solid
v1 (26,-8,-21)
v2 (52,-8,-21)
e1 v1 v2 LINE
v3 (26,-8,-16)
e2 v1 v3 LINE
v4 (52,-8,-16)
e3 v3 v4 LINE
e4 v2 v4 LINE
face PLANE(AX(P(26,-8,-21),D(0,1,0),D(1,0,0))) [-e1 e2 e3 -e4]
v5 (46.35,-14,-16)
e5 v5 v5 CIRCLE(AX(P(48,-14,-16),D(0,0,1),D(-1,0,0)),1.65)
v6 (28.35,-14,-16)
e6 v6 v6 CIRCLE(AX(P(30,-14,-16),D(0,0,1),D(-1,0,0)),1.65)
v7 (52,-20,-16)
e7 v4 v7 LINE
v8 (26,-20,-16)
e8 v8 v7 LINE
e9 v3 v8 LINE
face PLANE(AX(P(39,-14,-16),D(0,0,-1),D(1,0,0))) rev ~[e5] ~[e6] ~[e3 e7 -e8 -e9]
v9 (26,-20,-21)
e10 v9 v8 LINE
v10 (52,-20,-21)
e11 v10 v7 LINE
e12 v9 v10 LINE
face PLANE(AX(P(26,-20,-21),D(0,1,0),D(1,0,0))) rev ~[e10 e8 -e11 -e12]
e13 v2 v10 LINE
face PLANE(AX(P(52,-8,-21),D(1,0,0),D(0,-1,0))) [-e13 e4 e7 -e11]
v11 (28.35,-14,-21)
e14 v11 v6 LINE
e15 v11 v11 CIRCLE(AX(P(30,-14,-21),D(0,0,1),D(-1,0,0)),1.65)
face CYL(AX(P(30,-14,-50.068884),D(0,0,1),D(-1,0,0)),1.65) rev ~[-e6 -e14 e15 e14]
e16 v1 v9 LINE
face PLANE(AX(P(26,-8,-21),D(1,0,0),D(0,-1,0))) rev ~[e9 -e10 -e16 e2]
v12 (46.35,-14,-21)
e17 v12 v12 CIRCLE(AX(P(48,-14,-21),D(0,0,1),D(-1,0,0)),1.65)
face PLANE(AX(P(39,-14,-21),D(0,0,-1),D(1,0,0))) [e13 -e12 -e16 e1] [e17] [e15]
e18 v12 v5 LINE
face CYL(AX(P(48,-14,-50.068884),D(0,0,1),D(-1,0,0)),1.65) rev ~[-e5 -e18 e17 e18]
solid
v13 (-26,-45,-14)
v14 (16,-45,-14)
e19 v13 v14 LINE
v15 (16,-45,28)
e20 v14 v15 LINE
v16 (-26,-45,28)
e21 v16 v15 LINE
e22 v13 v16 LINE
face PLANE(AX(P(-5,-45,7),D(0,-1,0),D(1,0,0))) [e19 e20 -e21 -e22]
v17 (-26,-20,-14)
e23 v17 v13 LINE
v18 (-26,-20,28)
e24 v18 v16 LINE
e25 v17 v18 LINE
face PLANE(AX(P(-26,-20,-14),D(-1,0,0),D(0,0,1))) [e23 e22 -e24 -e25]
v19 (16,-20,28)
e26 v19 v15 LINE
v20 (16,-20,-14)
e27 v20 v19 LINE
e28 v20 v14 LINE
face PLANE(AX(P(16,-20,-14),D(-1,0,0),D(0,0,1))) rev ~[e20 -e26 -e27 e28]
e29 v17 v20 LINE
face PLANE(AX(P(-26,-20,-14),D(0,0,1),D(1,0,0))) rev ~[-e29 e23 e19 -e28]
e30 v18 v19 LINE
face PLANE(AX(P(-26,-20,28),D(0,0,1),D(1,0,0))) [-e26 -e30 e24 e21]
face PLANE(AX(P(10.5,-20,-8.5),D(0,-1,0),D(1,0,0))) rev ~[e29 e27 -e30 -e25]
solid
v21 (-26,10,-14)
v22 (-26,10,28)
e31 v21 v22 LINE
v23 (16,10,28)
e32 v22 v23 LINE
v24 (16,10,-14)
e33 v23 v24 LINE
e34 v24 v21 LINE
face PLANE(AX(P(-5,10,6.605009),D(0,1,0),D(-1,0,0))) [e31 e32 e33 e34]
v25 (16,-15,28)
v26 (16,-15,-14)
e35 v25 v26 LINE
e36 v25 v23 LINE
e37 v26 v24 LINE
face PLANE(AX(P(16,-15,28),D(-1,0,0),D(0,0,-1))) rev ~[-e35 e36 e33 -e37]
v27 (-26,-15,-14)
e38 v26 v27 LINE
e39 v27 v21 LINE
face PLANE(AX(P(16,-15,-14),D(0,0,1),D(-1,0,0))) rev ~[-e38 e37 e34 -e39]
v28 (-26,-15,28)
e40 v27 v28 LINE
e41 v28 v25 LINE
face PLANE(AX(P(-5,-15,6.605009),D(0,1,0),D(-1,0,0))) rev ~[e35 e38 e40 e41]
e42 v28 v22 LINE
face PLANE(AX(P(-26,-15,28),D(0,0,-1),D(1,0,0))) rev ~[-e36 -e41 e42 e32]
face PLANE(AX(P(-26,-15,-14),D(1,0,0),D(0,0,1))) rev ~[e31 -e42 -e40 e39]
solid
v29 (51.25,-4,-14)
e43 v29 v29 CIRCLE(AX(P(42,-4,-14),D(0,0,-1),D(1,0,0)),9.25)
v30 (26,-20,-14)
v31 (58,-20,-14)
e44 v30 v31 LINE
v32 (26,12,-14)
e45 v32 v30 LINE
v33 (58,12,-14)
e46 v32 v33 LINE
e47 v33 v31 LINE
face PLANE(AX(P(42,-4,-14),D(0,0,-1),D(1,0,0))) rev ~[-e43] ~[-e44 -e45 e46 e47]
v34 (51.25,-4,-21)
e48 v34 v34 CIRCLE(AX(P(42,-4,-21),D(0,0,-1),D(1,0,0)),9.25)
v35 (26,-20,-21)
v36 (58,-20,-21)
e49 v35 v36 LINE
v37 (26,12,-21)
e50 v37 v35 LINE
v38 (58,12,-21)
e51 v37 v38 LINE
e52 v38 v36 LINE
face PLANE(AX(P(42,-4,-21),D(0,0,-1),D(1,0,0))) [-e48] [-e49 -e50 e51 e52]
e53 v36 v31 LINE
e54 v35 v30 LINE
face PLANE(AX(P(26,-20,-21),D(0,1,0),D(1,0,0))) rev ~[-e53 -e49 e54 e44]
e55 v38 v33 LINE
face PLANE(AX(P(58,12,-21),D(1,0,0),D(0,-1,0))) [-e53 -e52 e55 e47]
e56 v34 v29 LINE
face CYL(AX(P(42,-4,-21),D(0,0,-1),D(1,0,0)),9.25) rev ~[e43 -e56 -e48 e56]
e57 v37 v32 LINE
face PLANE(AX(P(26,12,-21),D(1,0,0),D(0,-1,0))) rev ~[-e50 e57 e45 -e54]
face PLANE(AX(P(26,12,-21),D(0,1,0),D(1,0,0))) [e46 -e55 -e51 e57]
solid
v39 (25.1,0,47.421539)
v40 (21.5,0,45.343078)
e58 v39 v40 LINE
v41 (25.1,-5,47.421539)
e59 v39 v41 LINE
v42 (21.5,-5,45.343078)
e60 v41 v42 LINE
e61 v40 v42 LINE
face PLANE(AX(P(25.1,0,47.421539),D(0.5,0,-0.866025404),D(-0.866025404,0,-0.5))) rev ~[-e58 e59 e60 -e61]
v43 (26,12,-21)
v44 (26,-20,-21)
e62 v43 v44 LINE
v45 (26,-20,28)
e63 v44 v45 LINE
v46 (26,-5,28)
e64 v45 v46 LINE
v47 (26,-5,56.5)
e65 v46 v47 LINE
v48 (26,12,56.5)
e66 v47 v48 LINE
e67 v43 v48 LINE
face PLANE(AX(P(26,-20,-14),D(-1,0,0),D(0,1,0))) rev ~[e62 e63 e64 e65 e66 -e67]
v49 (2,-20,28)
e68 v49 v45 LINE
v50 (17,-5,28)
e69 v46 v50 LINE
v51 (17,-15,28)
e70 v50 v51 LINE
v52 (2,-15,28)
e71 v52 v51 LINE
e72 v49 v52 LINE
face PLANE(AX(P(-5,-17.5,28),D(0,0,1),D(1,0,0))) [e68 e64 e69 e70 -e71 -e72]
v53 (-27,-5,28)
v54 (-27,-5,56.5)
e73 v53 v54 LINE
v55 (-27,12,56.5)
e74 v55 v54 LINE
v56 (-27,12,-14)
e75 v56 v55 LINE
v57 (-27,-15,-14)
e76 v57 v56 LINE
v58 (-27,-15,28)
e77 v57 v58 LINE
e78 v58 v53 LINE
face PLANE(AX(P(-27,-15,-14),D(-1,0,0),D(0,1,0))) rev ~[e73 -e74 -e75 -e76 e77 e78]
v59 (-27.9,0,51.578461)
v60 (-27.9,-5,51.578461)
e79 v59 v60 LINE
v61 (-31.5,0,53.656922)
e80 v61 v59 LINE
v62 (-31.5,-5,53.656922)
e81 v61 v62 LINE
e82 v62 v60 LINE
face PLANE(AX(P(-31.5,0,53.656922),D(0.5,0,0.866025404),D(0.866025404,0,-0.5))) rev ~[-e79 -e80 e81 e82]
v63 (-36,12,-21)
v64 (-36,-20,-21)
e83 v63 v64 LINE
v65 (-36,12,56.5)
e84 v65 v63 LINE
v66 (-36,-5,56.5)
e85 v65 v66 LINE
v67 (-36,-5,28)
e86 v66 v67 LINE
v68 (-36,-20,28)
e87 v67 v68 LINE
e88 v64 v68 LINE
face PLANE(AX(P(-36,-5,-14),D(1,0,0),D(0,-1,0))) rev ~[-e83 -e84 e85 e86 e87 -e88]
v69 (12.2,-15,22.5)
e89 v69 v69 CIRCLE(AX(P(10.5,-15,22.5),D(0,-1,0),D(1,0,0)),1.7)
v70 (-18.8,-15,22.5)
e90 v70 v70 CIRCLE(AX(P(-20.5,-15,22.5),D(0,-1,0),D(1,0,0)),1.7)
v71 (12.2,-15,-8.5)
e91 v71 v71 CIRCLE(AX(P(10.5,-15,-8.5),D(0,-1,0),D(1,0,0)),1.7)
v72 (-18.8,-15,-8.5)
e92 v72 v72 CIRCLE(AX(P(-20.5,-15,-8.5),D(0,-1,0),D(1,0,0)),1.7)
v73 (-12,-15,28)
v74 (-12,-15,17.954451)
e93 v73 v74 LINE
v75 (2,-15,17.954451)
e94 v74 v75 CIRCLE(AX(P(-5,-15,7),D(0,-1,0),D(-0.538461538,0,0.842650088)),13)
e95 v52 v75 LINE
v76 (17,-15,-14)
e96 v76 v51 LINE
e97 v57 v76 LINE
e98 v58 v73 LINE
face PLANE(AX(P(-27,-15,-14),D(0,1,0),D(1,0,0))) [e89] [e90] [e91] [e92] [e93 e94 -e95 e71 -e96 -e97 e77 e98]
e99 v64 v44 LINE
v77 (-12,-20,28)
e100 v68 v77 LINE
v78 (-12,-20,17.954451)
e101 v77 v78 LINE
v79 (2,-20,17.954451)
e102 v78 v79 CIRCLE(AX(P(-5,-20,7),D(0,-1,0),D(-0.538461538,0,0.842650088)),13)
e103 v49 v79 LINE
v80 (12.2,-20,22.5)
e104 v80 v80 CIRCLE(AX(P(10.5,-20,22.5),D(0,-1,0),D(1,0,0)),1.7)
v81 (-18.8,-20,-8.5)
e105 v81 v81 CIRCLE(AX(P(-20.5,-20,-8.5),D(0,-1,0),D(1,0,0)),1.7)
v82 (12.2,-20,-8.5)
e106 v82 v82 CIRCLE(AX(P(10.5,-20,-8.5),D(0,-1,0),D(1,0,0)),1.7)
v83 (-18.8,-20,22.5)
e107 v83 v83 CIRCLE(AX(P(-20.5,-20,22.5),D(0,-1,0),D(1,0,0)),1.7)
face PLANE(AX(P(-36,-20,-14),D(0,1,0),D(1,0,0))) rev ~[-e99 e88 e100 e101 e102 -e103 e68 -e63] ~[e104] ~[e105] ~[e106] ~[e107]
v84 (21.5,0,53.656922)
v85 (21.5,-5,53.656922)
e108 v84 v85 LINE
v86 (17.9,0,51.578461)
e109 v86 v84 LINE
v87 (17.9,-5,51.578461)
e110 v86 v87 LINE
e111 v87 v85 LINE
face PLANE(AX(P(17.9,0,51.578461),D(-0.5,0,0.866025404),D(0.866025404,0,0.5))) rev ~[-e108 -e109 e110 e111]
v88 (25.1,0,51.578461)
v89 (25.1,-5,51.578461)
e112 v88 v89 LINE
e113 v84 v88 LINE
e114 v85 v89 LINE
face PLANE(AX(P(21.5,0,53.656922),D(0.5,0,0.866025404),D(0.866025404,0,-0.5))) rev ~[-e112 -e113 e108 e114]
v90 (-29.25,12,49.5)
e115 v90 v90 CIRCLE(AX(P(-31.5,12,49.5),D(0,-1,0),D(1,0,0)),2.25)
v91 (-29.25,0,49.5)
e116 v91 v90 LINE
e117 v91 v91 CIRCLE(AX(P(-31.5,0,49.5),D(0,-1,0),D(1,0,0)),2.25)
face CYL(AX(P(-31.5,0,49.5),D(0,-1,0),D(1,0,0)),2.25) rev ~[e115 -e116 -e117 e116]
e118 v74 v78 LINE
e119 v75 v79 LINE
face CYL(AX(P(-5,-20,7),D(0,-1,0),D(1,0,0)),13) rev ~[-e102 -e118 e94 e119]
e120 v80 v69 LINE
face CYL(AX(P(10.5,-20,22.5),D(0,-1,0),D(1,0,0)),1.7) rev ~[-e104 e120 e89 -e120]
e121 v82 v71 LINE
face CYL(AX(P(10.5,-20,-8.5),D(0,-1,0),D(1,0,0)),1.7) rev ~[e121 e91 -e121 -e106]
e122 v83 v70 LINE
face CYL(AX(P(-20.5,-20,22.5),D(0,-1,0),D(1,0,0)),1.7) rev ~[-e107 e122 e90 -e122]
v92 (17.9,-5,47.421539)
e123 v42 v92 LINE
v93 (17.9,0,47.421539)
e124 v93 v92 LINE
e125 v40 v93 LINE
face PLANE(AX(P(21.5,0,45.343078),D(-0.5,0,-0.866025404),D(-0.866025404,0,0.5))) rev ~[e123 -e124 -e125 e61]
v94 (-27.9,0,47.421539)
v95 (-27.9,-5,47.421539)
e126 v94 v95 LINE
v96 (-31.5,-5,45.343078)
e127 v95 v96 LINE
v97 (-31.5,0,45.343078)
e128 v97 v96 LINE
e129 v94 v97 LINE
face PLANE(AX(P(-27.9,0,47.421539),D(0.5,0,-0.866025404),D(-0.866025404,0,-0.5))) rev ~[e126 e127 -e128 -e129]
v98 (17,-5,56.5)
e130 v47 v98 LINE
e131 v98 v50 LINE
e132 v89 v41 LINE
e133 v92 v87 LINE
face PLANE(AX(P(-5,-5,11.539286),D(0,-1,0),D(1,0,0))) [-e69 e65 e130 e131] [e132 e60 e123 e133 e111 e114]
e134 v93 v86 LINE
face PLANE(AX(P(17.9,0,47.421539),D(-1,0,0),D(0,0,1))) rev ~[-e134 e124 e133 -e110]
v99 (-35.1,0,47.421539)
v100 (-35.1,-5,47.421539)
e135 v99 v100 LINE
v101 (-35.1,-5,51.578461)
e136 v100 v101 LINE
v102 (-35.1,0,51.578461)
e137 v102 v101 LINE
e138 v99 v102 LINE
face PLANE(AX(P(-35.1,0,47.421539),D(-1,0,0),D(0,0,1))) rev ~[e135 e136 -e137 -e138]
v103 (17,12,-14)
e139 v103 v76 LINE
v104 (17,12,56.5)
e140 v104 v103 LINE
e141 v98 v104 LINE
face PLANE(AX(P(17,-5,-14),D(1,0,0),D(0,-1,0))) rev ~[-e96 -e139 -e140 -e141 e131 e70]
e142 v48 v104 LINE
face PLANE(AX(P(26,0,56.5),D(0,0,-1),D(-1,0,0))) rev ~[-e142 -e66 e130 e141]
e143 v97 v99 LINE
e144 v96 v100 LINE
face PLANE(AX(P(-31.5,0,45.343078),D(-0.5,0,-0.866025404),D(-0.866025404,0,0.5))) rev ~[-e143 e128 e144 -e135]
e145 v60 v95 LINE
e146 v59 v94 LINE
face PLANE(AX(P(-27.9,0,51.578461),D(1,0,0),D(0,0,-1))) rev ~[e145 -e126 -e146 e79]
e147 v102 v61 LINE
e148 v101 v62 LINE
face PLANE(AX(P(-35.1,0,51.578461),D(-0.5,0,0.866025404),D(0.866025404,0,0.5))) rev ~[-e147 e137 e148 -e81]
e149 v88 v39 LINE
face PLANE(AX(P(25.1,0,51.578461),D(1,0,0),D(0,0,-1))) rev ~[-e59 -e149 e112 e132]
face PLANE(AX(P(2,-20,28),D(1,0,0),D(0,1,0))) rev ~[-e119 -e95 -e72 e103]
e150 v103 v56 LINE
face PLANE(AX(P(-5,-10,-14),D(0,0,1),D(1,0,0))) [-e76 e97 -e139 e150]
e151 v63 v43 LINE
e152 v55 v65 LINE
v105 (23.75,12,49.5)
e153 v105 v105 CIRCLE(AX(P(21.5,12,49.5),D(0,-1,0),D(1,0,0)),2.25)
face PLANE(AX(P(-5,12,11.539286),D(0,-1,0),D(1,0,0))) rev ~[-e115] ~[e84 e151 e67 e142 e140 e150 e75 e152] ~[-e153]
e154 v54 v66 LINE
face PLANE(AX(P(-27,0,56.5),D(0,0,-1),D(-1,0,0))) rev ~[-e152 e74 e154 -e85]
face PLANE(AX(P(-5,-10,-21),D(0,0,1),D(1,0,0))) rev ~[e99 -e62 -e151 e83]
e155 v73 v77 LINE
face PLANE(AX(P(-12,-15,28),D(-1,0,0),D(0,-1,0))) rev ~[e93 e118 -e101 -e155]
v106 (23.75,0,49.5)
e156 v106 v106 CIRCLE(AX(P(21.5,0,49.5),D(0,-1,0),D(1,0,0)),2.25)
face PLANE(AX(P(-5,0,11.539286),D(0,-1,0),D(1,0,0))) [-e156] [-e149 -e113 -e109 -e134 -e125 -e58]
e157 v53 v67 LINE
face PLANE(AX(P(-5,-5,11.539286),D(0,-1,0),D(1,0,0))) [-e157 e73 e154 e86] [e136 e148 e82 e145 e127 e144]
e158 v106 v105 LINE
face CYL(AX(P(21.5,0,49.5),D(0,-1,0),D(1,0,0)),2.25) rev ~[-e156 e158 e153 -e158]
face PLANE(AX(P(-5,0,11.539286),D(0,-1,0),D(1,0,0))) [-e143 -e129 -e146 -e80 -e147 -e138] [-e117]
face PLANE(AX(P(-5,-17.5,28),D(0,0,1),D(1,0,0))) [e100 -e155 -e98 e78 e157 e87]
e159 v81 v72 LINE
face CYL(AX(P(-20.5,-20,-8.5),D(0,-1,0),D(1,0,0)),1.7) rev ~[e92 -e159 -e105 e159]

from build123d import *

# Parameters (mm, degrees)
F1_R      = 2.25
F2_DEPTH  = 12
F4_DEPTH  = 5
F5_W      = 44
F5_H      = 10
F5_H_2    = 5
F6_DEPTH  = 7
F7_DEPTH  = 42
F8_R      = 1.7
F8_R_2    = 13
F9_DEPTH  = 5
F11_REACH = 63.8670687473
F12_R     = 1.7
F13_DEPTH = 25
F14_W     = 42
F14_H     = 42
F14_R     = 1.7
F14_R_2   = 13
F15_DEPTH = 25
F16_W     = 32
F16_H     = 32
F16_R     = 9.25
F17_DEPTH = 7
F18_W     = 26
F18_H     = 12
F19_DEPTH = 5
F20_D     = 3.3


with BuildPart() as f2:
    # F1 (on Front) → F2 (new body)
    with BuildSketch(Plane.XZ):
        Polygon((-27, 56.5), (-36, 56.5), (-36, -21), (26, -21), (26, 56.5), (17, 56.5), (17, -14), (-27, -14), align=None)
        with Locations((-31.5, 49.5)):
            Circle(F1_R, mode=Mode.SUBTRACT)
        with Locations((21.5, 49.5)):
            Circle(F1_R, mode=Mode.SUBTRACT)
    extrude(amount=-F2_DEPTH)

    # F3 (on face) → F4 (join)
    with BuildSketch(Plane.XZ):
        Polygon((-27, -14), (-27, 56.5), (-36, 56.5), (-36, -21), (26, -21), (26, 56.5), (17, 56.5), (17, -14), align=None)
        Polygon((-31.5, 53.6569219382), (-27.9, 51.5784609691), (-27.9, 47.4215390309), (-31.5, 45.3430780618), (-35.1, 47.4215390309), (-35.1, 51.5784609691), align=None, mode=Mode.SUBTRACT)
        Polygon((21.5, 53.6569219382), (25.1, 51.5784609691), (25.1, 47.4215390309), (21.5, 45.3430780618), (17.9, 47.4215390309), (17.9, 51.5784609691), align=None, mode=Mode.SUBTRACT)
    extrude(amount=F4_DEPTH)

    # F5 (on face) → F6 (join, through all)
    with BuildSketch(Plane.XY.offset(-14)):
        with Locations((-5, -10)):
            Rectangle(F5_W, F5_H)
        with Locations((-5, -17.5)):
            Rectangle(F5_W, F5_H_2)
        Polygon((-27, -15), (-27, -5), (-36, -5), (-36, -20), (-27, -20), align=None)
        Polygon((26, -5), (17, -5), (17, -15), (17, -20), (26, -20), align=None)
    extrude(amount=-F6_DEPTH)

    # F5 (on face) → F7 (join)
    with BuildSketch(Plane.XY.offset(-14)):
        with Locations((-5, -17.5)):
            Rectangle(F5_W, F5_H_2)
        Polygon((-27, -15), (-27, -5), (-36, -5), (-36, -20), (-27, -20), align=None)
        Polygon((26, -5), (17, -5), (17, -15), (17, -20), (26, -20), align=None)
    extrude(amount=F7_DEPTH)

    # F8 (on face) → F9 (cut, through all)
    with BuildSketch(Plane.XZ.offset(20)):
        with Locations((-20.5, 22.5)):
            Circle(F8_R)
        with Locations((-5, 7)):
            Circle(F8_R_2)
        with Locations((-20.5, -8.5)):
            Circle(F8_R)
        with Locations((10.5, -8.5)):
            Circle(F8_R)
        with Locations((10.5, 22.5)):
            Circle(F8_R)
    extrude(amount=-F9_DEPTH, mode=Mode.SUBTRACT)

    f11_end = f2.faces().sort_by_distance((-18, -17.5, 7))[0]
    # F10 (on face) → F11 (cut, up to a face of the model that its end follows)
    with BuildSketch(Plane.XY.offset(28)):
        Polygon((2, -15), (-5, -15), (-12, -15), (-12, -20), (2, -20), align=None)
    f11_long = extrude(amount=-F11_REACH, mode=Mode.PRIVATE)
    add(split(f11_long, bisect_by=f11_end, keep=Keep.ALL, mode=Mode.PRIVATE).solids().sort_by_distance((-5, -17.5, 28))[0], mode=Mode.SUBTRACT)


with BuildPart() as f13:
    # F12 (on face) → F13 (new body)
    with BuildSketch(Plane(origin=(0, -15, 0), x_dir=(-1, 0, 0), z_dir=(0, 1, 0))):
        with BuildLine():
            Line((-16, -14), (26, -14))
            Line((26, -14), (26, 28))
            Line((26, 28), (12, 28))
            Line((12, 28), (12, 17.9544511501))
            ThreePointArc((12, 17.9544511501), (5, -6), (-2, 17.9544511501))
            Line((-2, 17.9544511501), (-2, 28))
            Line((-2, 28), (-16, 28))
            Line((-16, 28), (-16, -14))
        make_face()
        with Locations((-10.5, -8.5)):
            Circle(F12_R, mode=Mode.SUBTRACT)
        with Locations((20.5, -8.5)):
            Circle(F12_R, mode=Mode.SUBTRACT)
        with Locations((-10.5, 22.5)):
            Circle(F12_R, mode=Mode.SUBTRACT)
        with Locations((20.5, 22.5)):
            Circle(F12_R, mode=Mode.SUBTRACT)
        with BuildLine():
            Line((12, 17.9544511501), (12, 28))
            Line((12, 28), (-2, 28))
            Line((-2, 28), (-2, 17.9544511501))
            ThreePointArc((-2, 17.9544511501), (5, -6), (12, 17.9544511501))
        make_face()
        with Locations((-10.5, 22.5)):
            Circle(F12_R)
        with Locations((20.5, 22.5)):
            Circle(F12_R)
        with Locations((-10.5, -8.5)):
            Circle(F12_R)
        with Locations((20.5, -8.5)):
            Circle(F12_R)
    extrude(amount=F13_DEPTH)


with BuildPart() as f15:
    # F14 (on face) → F15 (new body)
    with BuildSketch(Plane.XZ.offset(20)):
        with Locations((-5, 7)):
            Rectangle(F14_W, F14_H)
        with Locations((-20.5, -8.5)):
            Circle(F14_R, mode=Mode.SUBTRACT)
        with Locations((10.5, -8.5)):
            Circle(F14_R, mode=Mode.SUBTRACT)
        with Locations((-20.5, 22.5)):
            Circle(F14_R, mode=Mode.SUBTRACT)
        with Locations((-5, 7)):
            Circle(F14_R_2, mode=Mode.SUBTRACT)
        with Locations((10.5, 22.5)):
            Circle(F14_R, mode=Mode.SUBTRACT)
    extrude(amount=F15_DEPTH)

    # F8 (on face) → F15, piece 2 (join)
    with BuildSketch(Plane.XZ.offset(20)):
        with Locations((-20.5, 22.5)):
            Circle(F8_R)
    extrude(amount=F15_DEPTH)

    # F8 (on face) → F15, piece 3 (join)
    with BuildSketch(Plane.XZ.offset(20)):
        with Locations((-5, 7)):
            Circle(F8_R_2)
    extrude(amount=F15_DEPTH)

    # F8 (on face) → F15, piece 4 (join)
    with BuildSketch(Plane.XZ.offset(20)):
        with Locations((-20.5, -8.5)):
            Circle(F8_R)
    extrude(amount=F15_DEPTH)

    # F8 (on face) → F15, piece 5 (join)
    with BuildSketch(Plane.XZ.offset(20)):
        with Locations((10.5, 22.5)):
            Circle(F8_R)
    extrude(amount=F15_DEPTH)

    # F8 (on face) → F15, piece 6 (join)
    with BuildSketch(Plane.XZ.offset(20)):
        with Locations((10.5, -8.5)):
            Circle(F8_R)
    extrude(amount=F15_DEPTH)


with BuildPart() as f17:
    # F16 (on face) → F17 (new body, through all)
    with BuildSketch(Plane(origin=(0, 0, -21), x_dir=(1, 0, 0), z_dir=(0, 0, -1))):
        with Locations((42, 4)):
            Rectangle(F16_W, F16_H)
        with Locations((42, 4)):
            Circle(F16_R, mode=Mode.SUBTRACT)
    extrude(amount=-F17_DEPTH)


with BuildPart() as f19:
    # F18 (on face) → F19 (new body)
    with BuildSketch(Plane(origin=(0, 0, -21), x_dir=(1, 0, 0), z_dir=(0, 0, -1))):
        with Locations((39, 14)):
            Rectangle(F18_W, F18_H)
    extrude(amount=-F19_DEPTH)

    # F20 (through all)
    with Locations(Plane(origin=(0, 0, -21), x_dir=(1, 0, 0), z_dir=(0, 0, -1))):
        with Locations((30, 14), (48, 14)):
            Hole(F20_D / 2)


solid = Compound([f2.part, f13.part, f15.part, f17.part, f19.part])
